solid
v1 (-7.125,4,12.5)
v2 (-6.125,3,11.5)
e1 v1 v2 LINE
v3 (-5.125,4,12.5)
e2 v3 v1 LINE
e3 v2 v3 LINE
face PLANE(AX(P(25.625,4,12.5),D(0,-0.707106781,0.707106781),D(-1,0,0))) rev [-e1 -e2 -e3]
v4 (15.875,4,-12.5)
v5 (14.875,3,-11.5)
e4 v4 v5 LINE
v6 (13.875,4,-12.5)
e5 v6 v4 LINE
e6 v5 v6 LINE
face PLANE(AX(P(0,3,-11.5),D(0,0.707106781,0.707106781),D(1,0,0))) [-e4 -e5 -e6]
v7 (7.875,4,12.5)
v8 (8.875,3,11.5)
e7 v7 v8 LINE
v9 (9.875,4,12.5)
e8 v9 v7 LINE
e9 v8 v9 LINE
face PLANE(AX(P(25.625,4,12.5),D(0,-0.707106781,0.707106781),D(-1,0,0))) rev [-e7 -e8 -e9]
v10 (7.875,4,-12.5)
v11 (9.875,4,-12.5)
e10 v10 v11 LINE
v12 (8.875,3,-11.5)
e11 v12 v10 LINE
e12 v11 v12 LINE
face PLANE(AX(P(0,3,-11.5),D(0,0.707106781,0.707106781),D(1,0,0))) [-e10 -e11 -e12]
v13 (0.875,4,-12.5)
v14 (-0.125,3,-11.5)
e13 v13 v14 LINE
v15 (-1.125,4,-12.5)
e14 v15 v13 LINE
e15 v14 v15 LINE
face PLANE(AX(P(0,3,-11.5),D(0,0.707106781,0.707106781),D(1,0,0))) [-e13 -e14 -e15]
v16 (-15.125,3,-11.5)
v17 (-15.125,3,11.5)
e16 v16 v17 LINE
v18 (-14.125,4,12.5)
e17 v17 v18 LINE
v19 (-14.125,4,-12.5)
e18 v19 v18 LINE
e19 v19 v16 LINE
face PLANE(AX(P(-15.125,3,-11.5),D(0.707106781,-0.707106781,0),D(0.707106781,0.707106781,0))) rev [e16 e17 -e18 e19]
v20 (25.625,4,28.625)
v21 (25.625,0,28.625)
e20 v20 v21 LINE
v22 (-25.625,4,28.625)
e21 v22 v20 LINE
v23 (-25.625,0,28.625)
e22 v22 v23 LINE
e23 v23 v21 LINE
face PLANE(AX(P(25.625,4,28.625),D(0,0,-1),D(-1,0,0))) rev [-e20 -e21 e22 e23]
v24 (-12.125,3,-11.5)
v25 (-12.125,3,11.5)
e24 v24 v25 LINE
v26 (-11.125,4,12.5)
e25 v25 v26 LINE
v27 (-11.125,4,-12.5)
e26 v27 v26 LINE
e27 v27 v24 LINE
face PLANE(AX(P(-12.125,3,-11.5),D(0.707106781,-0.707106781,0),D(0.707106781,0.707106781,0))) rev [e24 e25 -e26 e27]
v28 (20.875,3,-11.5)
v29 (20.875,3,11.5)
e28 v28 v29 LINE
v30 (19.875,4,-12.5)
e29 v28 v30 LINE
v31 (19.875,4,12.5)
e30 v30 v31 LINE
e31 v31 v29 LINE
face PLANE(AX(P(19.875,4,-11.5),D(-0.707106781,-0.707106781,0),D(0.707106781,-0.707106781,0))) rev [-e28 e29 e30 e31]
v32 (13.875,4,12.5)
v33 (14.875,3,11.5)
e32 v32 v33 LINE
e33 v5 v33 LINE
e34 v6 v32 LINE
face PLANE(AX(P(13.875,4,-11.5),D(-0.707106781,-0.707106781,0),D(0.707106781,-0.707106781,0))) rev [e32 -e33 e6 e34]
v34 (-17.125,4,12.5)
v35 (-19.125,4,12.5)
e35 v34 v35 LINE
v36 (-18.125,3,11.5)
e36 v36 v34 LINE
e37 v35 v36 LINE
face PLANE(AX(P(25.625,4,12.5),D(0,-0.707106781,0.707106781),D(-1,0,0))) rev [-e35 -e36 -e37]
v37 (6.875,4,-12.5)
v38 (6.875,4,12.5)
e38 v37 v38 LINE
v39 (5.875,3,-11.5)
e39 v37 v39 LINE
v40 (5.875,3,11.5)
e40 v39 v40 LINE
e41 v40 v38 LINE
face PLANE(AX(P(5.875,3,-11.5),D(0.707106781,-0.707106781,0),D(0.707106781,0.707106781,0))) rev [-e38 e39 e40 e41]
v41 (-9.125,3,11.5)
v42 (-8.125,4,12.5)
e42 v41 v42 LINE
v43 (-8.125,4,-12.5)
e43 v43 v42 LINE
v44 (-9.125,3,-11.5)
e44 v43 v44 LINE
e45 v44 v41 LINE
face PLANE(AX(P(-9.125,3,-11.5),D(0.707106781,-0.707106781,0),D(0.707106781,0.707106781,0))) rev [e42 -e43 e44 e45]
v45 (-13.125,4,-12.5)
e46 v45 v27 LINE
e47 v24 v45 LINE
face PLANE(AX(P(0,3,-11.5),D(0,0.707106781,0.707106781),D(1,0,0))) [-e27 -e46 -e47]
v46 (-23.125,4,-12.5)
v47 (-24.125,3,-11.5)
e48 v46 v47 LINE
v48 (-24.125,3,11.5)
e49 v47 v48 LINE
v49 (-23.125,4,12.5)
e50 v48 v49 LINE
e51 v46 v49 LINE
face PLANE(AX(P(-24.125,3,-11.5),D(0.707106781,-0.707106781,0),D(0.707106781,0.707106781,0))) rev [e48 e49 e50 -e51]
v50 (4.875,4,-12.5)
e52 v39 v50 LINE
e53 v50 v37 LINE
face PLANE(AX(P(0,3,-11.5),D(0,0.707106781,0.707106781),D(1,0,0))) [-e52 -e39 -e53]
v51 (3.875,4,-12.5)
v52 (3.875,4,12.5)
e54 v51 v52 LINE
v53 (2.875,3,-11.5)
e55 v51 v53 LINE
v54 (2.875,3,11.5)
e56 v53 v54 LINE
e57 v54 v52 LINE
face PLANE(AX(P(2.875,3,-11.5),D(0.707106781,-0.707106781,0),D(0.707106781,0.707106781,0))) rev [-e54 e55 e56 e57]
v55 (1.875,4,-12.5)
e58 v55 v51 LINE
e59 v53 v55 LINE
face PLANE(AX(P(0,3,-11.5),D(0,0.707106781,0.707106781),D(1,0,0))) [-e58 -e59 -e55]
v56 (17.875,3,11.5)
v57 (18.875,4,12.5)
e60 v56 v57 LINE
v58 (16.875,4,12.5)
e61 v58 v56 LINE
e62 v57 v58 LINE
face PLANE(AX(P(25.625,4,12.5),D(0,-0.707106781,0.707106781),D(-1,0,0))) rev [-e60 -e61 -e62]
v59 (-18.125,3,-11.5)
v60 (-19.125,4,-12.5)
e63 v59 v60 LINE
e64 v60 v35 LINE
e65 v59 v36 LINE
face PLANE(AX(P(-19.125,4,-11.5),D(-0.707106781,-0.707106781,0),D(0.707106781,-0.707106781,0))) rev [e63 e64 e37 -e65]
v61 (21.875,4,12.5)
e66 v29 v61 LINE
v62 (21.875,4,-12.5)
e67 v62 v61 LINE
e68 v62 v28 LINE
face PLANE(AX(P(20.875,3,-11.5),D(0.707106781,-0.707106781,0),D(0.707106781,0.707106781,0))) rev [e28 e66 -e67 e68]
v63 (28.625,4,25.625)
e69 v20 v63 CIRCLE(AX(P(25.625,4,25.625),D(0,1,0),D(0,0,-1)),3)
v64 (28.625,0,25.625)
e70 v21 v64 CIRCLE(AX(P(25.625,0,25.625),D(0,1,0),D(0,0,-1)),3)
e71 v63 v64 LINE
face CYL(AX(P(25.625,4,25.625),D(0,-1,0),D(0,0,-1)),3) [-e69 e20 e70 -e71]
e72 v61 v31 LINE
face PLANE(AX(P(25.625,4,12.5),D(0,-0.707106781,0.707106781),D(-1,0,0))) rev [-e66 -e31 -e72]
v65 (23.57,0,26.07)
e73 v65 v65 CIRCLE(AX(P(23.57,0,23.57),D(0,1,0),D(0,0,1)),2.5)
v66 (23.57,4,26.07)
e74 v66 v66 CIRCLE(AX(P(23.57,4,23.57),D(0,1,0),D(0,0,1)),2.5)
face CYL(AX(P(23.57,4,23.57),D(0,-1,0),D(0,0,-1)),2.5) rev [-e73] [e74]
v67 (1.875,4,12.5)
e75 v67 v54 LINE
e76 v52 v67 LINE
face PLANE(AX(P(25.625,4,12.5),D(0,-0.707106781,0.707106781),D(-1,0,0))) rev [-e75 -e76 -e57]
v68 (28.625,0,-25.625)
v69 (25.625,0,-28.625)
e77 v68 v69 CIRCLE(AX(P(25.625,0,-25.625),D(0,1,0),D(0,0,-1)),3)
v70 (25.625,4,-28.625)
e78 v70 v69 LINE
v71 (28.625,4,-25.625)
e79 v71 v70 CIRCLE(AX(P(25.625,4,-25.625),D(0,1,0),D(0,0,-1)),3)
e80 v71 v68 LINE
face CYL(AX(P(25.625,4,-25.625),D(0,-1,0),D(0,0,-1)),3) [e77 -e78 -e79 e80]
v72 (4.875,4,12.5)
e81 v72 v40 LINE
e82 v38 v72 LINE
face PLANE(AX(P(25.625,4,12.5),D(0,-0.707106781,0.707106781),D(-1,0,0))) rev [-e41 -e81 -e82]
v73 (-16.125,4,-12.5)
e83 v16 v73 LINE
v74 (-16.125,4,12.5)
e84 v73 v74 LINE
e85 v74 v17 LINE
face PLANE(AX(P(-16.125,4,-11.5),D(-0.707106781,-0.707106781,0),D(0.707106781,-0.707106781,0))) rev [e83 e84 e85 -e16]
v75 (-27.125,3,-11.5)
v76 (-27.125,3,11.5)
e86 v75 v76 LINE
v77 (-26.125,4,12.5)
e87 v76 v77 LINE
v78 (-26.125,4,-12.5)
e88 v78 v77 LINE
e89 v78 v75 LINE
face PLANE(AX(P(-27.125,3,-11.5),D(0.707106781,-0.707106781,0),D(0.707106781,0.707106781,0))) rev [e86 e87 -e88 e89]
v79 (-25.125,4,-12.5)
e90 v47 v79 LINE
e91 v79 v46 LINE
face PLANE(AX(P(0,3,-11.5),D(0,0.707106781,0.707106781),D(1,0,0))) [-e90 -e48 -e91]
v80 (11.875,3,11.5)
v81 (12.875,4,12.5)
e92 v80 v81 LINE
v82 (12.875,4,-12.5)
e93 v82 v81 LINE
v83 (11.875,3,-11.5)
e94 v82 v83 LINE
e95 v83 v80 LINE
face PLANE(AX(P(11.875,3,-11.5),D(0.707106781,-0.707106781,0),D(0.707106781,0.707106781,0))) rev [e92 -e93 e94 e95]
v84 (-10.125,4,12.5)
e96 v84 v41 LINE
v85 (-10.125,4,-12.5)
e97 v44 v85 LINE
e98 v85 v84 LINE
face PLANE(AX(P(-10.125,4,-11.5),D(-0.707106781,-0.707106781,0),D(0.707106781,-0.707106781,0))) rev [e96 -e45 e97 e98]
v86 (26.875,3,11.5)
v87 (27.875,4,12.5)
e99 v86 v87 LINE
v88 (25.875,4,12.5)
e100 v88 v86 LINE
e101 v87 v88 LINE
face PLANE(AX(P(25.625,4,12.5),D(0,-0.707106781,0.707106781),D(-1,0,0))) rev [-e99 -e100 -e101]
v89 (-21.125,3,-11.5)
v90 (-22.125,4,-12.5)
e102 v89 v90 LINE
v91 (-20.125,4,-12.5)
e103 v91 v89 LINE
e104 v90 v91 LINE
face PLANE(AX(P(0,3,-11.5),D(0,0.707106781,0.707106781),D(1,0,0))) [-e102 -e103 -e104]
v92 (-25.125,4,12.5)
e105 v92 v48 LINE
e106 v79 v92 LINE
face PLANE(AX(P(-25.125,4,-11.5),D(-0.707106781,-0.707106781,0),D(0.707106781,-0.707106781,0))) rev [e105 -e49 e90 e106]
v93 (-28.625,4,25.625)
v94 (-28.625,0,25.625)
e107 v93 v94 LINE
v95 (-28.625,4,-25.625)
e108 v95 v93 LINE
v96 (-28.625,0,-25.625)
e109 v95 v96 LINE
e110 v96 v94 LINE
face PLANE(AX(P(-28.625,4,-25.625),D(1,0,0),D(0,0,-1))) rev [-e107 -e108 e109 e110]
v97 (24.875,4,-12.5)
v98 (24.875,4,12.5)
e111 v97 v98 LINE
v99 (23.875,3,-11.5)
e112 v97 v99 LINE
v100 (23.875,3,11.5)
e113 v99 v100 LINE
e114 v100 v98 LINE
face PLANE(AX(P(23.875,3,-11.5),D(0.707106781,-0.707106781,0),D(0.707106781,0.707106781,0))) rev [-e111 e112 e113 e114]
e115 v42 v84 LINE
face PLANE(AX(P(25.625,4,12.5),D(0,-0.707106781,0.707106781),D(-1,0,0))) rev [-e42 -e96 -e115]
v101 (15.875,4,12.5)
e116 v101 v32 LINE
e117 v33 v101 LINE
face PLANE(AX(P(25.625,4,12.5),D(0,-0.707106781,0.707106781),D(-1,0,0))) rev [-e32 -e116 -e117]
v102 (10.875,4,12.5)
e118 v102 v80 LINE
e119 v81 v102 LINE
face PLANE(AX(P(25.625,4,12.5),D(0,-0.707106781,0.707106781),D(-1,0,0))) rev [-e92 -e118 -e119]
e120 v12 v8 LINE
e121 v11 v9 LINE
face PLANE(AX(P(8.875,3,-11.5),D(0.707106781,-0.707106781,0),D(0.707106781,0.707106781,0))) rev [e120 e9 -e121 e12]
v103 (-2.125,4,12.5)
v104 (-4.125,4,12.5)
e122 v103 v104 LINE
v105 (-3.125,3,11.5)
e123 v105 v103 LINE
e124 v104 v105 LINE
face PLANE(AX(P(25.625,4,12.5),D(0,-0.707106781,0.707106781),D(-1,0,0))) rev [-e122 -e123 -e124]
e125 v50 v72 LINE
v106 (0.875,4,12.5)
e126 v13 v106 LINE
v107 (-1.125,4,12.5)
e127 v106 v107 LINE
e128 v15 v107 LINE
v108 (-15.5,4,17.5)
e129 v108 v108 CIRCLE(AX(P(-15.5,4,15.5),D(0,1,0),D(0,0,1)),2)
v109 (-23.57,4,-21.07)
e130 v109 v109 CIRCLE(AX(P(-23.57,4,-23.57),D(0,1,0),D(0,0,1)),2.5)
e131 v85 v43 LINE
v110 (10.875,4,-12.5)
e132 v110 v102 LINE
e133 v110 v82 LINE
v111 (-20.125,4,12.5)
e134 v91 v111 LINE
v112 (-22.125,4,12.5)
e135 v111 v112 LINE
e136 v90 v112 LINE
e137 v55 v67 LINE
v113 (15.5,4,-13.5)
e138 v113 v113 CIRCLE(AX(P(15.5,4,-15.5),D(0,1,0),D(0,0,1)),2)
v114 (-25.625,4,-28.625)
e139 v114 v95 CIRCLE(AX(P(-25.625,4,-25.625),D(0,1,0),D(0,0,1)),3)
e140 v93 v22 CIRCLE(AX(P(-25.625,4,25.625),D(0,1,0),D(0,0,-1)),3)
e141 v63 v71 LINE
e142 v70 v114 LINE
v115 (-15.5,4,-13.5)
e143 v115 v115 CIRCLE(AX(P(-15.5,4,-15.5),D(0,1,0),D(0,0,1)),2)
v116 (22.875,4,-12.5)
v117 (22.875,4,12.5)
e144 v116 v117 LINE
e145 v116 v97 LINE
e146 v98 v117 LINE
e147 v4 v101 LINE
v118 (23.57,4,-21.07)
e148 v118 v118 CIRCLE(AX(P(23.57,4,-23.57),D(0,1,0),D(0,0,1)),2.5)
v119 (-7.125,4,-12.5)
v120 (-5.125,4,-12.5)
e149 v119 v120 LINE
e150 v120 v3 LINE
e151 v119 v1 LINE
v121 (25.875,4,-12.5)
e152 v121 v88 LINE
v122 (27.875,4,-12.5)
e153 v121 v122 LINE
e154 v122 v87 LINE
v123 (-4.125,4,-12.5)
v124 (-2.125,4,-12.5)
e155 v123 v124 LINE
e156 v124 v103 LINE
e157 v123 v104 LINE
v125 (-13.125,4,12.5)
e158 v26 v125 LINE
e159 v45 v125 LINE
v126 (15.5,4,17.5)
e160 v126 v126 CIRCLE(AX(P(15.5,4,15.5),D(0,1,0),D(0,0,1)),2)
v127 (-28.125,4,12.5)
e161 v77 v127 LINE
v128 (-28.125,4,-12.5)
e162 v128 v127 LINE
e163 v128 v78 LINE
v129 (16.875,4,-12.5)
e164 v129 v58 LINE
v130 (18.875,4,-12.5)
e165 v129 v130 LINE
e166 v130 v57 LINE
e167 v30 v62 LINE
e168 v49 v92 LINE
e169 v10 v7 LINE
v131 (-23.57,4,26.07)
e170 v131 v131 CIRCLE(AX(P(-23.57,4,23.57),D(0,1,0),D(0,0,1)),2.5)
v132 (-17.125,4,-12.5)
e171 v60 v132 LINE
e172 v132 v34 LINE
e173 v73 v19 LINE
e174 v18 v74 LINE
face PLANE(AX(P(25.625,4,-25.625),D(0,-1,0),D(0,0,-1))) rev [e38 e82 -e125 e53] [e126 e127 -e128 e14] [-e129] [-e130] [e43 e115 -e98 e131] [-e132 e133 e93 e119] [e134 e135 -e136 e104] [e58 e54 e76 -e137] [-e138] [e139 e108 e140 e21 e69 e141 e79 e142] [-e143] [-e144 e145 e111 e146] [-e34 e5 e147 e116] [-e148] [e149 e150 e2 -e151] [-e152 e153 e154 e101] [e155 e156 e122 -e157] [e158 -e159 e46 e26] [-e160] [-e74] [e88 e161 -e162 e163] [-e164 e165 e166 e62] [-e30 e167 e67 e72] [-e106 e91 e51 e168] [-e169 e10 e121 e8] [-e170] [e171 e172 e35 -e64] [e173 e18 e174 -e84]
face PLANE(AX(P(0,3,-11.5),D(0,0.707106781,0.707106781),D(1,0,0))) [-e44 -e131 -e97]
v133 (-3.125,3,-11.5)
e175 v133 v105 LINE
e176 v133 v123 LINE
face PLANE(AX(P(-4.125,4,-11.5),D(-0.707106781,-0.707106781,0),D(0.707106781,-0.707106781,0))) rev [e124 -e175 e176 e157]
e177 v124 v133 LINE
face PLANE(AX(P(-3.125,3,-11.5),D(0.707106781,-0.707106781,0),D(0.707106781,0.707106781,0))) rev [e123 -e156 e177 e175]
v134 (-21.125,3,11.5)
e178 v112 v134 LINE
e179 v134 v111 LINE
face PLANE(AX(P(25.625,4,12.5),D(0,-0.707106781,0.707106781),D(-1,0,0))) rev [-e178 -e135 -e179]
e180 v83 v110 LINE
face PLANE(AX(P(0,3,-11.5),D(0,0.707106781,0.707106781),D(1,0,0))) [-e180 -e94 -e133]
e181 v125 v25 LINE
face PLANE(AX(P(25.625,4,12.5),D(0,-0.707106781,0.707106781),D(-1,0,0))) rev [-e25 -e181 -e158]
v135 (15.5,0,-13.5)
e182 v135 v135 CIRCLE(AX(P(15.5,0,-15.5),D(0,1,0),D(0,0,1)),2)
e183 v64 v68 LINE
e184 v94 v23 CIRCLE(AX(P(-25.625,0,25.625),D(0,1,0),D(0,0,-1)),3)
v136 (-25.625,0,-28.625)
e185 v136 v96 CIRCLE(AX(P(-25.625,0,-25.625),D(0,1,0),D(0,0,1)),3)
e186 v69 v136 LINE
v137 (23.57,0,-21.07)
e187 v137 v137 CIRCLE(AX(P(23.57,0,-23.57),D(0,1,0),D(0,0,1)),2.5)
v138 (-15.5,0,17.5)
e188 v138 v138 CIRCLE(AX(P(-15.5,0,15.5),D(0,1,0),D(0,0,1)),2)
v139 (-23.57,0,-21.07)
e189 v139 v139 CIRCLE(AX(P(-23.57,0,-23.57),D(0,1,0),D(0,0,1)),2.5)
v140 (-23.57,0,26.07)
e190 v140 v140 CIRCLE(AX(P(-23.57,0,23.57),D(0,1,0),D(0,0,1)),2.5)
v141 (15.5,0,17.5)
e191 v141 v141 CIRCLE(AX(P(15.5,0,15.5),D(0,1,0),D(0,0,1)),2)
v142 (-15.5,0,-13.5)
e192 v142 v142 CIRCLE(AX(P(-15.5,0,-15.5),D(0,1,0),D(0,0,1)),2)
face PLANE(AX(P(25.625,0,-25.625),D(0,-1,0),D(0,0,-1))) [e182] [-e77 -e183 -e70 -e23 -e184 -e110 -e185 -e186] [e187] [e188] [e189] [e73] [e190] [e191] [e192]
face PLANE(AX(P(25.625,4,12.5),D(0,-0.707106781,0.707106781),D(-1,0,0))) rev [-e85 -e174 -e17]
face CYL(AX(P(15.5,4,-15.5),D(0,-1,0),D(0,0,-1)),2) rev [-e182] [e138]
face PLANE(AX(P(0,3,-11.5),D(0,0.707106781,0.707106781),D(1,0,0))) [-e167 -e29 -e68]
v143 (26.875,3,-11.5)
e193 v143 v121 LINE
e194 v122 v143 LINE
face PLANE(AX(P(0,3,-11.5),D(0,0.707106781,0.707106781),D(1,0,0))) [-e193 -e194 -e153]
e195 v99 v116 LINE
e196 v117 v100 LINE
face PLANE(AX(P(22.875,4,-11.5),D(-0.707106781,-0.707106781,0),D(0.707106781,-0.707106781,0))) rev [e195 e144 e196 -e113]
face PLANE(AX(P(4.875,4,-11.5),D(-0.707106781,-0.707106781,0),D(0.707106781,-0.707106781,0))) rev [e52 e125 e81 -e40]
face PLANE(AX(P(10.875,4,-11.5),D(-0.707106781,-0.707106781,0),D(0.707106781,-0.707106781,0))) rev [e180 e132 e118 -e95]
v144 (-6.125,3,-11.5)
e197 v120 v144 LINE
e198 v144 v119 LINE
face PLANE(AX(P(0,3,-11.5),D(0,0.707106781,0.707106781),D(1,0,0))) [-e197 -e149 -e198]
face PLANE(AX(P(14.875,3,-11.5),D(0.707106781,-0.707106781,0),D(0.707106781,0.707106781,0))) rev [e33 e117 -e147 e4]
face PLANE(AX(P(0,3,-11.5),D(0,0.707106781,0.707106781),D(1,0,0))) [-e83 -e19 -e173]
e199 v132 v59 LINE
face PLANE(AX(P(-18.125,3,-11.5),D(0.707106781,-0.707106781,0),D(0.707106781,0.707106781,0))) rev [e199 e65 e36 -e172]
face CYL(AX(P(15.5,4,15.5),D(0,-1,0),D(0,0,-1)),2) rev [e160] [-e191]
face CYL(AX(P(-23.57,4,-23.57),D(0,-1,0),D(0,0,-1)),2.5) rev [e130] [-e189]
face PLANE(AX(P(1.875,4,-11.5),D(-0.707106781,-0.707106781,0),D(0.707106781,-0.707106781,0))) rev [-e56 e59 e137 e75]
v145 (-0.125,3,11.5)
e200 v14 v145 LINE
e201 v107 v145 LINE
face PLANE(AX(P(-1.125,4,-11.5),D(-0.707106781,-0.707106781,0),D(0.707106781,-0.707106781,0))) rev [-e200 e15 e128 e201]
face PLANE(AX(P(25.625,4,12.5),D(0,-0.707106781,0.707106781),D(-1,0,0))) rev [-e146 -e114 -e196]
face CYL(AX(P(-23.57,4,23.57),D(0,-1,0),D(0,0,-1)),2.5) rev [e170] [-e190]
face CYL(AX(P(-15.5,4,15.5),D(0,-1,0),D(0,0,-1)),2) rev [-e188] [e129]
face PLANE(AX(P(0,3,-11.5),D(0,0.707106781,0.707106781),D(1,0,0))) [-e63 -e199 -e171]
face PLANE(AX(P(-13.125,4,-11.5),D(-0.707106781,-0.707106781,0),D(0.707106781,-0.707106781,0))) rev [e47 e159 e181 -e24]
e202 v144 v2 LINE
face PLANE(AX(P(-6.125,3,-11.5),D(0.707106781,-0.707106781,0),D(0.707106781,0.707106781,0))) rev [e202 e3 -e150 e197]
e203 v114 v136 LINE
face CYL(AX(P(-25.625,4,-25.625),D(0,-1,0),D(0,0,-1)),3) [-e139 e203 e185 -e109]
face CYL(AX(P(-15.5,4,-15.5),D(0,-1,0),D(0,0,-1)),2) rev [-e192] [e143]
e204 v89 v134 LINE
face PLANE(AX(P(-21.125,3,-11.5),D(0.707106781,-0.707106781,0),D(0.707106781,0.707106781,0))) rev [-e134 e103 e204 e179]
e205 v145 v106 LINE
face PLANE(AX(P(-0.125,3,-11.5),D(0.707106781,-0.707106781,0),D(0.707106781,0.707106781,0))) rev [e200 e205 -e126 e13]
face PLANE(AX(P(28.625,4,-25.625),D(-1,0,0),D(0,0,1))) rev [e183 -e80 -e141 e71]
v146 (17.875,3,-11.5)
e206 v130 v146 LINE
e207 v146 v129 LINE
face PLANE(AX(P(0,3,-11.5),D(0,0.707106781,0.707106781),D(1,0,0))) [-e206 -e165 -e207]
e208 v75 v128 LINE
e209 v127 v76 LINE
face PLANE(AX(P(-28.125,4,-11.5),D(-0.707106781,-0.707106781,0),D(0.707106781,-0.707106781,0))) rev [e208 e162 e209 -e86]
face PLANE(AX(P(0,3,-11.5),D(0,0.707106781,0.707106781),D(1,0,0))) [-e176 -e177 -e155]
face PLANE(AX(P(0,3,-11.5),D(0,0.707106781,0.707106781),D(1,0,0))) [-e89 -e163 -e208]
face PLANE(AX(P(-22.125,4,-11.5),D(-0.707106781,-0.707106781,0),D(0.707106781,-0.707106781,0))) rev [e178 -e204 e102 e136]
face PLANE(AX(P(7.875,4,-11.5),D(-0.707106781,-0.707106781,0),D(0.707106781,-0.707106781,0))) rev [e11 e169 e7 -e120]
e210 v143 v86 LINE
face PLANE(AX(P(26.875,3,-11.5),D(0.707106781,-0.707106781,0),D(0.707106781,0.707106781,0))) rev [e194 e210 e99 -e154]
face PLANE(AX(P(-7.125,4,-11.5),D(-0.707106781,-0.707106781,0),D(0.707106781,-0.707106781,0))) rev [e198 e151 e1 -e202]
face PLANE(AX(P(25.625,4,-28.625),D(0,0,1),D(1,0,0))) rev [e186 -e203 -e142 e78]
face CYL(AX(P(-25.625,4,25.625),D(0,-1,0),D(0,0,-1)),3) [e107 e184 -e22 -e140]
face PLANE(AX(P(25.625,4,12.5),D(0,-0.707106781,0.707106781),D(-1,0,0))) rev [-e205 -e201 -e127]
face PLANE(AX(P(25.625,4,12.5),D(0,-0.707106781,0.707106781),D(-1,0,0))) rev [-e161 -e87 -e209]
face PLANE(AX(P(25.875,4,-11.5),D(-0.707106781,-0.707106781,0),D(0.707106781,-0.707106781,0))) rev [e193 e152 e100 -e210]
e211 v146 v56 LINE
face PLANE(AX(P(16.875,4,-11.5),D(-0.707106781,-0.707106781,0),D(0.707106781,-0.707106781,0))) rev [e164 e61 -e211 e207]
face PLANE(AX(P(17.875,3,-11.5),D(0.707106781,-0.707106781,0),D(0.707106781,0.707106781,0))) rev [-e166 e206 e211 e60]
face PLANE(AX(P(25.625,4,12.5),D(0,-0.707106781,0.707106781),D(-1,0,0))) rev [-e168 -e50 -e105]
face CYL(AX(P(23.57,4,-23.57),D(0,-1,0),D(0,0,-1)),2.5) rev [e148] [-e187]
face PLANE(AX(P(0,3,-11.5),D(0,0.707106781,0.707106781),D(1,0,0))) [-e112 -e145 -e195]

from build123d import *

# Parameters (mm, degrees)
SKETCH1_R           = 2
SKETCH1_R_2         = 2.5
BOSS_EXTRUDE1_DEPTH = 4
CUT_EXTRUDE2_DEPTH  = 23
CHAMFER2_SIZE       = 1


with BuildPart() as part:
    # Sketch1 → Boss-Extrude1 (new body)
    with BuildSketch(Plane(origin=(0, 0, 0), x_dir=(1, 0, 0), z_dir=(0, 1, 0))):
        with BuildLine():
            Line((25.625, 28.625), (-25.625, 28.625))
            ThreePointArc((-25.625, 28.625), (-27.746320344, 27.746320344), (-28.625, 25.625))
            Line((-28.625, 25.625), (-28.625, -25.625))
            ThreePointArc((-28.625, -25.625), (-27.746320344, -27.746320344), (-25.625, -28.625))
            Line((-25.625, -28.625), (25.625, -28.625))
            ThreePointArc((25.625, -28.625), (27.746320344, -27.746320344), (28.625, -25.625))
            Line((28.625, -25.625), (28.625, 25.625))
            ThreePointArc((28.625, 25.625), (27.746320344, 27.746320344), (25.625, 28.625))
        make_face()
        with Locations(Location((-15.5, 15.5, 0), (0, 0, 270))):
            Circle(SKETCH1_R, mode=Mode.SUBTRACT)
        with Locations(Location((-23.57, 23.57, 0), (0, 0, 270))):
            Circle(SKETCH1_R_2, mode=Mode.SUBTRACT)
        with Locations(Location((23.57, 23.57, 0), (0, 0, 270))):
            Circle(SKETCH1_R_2, mode=Mode.SUBTRACT)
        with Locations(Location((15.5, 15.5, 0), (0, 0, 270))):
            Circle(SKETCH1_R, mode=Mode.SUBTRACT)
        with Locations(Location((15.5, -15.5, 0), (0, 0, 270))):
            Circle(SKETCH1_R, mode=Mode.SUBTRACT)
        with Locations(Location((-15.5, -15.5, 0), (0, 0, 270))):
            Circle(SKETCH1_R, mode=Mode.SUBTRACT)
        with Locations(Location((-23.57, -23.57, 0), (0, 0, 270))):
            Circle(SKETCH1_R_2, mode=Mode.SUBTRACT)
        with Locations(Location((23.57, -23.57, 0), (0, 0, 270))):
            Circle(SKETCH1_R_2, mode=Mode.SUBTRACT)
    extrude(amount=BOSS_EXTRUDE1_DEPTH)

    # Sketch3 → Cut-Extrude2 (cut)
    with BuildSketch(Plane.XY.offset(11.5)):
        Polygon((-28.125, 4), (-27.125, 3), (-26.125, 4), align=None)
        Polygon((-25.125, 4), (-24.125, 3), (-23.125, 4), align=None)
        Polygon((-22.125, 4), (-21.125, 3), (-20.125, 4), align=None)
        Polygon((-19.125, 4), (-18.125, 3), (-17.125, 4), align=None)
        Polygon((-16.125, 4), (-15.125, 3), (-14.125, 4), align=None)
        Polygon((-13.125, 4), (-12.125, 3), (-11.125, 4), align=None)
        Polygon((-10.125, 4), (-9.125, 3), (-8.125, 4), align=None)
        Polygon((-7.125, 4), (-6.125, 3), (-5.125, 4), align=None)
        Polygon((-4.125, 4), (-3.125, 3), (-2.125, 4), align=None)
        Polygon((-1.125, 4), (-0.125, 3), (0.875, 4), align=None)
        Polygon((1.875, 4), (2.875, 3), (3.875, 4), align=None)
        Polygon((4.875, 4), (5.875, 3), (6.875, 4), align=None)
        Polygon((7.875, 4), (8.875, 3), (9.875, 4), align=None)
        Polygon((10.875, 4), (11.875, 3), (12.875, 4), align=None)
        Polygon((13.875, 4), (14.875, 3), (15.875, 4), align=None)
        Polygon((16.875, 4), (17.875, 3), (18.875, 4), align=None)
        Polygon((19.875, 4), (20.875, 3), (21.875, 4), align=None)
        Polygon((22.875, 4), (23.875, 3), (24.875, 4), align=None)
        Polygon((25.875, 4), (26.875, 3), (27.875, 4), align=None)
    extrude(amount=-CUT_EXTRUDE2_DEPTH, mode=Mode.SUBTRACT)

    # Chamfer2
    chamfer2_edges = [part.edges().sort_by_distance(p)[0] for p in [
        (26.875, 4, -11.5),
        (23.875, 4, -11.5),
        (20.875, 4, -11.5),
        (17.875, 4, -11.5),
        (14.875, 4, -11.5),
        (11.875, 4, -11.5),
        (8.875, 4, -11.5),
        (5.875, 4, -11.5),
        (2.875, 4, -11.5),
        (-0.125, 4, -11.5),
        (-3.125, 4, -11.5),
        (-6.125, 4, -11.5),
        (-9.125, 4, -11.5),
        (-12.125, 4, -11.5),
        (-15.125, 4, -11.5),
        (-18.125, 4, -11.5),
        (-21.125, 4, -11.5),
        (-24.125, 4, -11.5),
        (-27.125, 4, -11.5),
        (26.875, 4, 11.5),
        (23.875, 4, 11.5),
        (20.875, 4, 11.5),
        (17.875, 4, 11.5),
        (14.875, 4, 11.5),
        (11.875, 4, 11.5),
        (8.875, 4, 11.5),
        (5.875, 4, 11.5),
        (2.875, 4, 11.5),
        (-0.125, 4, 11.5),
        (-3.125, 4, 11.5),
        (-6.125, 4, 11.5),
        (-9.125, 4, 11.5),
        (-12.125, 4, 11.5),
        (-15.125, 4, 11.5),
        (-18.125, 4, 11.5),
        (-21.125, 4, 11.5),
        (-24.125, 4, 11.5),
        (-27.125, 4, 11.5),
    ]]
    chamfer(chamfer2_edges, length=CHAMFER2_SIZE - 0.0001)  # a hair under: the kernel refuses the full size


solid = part.part
